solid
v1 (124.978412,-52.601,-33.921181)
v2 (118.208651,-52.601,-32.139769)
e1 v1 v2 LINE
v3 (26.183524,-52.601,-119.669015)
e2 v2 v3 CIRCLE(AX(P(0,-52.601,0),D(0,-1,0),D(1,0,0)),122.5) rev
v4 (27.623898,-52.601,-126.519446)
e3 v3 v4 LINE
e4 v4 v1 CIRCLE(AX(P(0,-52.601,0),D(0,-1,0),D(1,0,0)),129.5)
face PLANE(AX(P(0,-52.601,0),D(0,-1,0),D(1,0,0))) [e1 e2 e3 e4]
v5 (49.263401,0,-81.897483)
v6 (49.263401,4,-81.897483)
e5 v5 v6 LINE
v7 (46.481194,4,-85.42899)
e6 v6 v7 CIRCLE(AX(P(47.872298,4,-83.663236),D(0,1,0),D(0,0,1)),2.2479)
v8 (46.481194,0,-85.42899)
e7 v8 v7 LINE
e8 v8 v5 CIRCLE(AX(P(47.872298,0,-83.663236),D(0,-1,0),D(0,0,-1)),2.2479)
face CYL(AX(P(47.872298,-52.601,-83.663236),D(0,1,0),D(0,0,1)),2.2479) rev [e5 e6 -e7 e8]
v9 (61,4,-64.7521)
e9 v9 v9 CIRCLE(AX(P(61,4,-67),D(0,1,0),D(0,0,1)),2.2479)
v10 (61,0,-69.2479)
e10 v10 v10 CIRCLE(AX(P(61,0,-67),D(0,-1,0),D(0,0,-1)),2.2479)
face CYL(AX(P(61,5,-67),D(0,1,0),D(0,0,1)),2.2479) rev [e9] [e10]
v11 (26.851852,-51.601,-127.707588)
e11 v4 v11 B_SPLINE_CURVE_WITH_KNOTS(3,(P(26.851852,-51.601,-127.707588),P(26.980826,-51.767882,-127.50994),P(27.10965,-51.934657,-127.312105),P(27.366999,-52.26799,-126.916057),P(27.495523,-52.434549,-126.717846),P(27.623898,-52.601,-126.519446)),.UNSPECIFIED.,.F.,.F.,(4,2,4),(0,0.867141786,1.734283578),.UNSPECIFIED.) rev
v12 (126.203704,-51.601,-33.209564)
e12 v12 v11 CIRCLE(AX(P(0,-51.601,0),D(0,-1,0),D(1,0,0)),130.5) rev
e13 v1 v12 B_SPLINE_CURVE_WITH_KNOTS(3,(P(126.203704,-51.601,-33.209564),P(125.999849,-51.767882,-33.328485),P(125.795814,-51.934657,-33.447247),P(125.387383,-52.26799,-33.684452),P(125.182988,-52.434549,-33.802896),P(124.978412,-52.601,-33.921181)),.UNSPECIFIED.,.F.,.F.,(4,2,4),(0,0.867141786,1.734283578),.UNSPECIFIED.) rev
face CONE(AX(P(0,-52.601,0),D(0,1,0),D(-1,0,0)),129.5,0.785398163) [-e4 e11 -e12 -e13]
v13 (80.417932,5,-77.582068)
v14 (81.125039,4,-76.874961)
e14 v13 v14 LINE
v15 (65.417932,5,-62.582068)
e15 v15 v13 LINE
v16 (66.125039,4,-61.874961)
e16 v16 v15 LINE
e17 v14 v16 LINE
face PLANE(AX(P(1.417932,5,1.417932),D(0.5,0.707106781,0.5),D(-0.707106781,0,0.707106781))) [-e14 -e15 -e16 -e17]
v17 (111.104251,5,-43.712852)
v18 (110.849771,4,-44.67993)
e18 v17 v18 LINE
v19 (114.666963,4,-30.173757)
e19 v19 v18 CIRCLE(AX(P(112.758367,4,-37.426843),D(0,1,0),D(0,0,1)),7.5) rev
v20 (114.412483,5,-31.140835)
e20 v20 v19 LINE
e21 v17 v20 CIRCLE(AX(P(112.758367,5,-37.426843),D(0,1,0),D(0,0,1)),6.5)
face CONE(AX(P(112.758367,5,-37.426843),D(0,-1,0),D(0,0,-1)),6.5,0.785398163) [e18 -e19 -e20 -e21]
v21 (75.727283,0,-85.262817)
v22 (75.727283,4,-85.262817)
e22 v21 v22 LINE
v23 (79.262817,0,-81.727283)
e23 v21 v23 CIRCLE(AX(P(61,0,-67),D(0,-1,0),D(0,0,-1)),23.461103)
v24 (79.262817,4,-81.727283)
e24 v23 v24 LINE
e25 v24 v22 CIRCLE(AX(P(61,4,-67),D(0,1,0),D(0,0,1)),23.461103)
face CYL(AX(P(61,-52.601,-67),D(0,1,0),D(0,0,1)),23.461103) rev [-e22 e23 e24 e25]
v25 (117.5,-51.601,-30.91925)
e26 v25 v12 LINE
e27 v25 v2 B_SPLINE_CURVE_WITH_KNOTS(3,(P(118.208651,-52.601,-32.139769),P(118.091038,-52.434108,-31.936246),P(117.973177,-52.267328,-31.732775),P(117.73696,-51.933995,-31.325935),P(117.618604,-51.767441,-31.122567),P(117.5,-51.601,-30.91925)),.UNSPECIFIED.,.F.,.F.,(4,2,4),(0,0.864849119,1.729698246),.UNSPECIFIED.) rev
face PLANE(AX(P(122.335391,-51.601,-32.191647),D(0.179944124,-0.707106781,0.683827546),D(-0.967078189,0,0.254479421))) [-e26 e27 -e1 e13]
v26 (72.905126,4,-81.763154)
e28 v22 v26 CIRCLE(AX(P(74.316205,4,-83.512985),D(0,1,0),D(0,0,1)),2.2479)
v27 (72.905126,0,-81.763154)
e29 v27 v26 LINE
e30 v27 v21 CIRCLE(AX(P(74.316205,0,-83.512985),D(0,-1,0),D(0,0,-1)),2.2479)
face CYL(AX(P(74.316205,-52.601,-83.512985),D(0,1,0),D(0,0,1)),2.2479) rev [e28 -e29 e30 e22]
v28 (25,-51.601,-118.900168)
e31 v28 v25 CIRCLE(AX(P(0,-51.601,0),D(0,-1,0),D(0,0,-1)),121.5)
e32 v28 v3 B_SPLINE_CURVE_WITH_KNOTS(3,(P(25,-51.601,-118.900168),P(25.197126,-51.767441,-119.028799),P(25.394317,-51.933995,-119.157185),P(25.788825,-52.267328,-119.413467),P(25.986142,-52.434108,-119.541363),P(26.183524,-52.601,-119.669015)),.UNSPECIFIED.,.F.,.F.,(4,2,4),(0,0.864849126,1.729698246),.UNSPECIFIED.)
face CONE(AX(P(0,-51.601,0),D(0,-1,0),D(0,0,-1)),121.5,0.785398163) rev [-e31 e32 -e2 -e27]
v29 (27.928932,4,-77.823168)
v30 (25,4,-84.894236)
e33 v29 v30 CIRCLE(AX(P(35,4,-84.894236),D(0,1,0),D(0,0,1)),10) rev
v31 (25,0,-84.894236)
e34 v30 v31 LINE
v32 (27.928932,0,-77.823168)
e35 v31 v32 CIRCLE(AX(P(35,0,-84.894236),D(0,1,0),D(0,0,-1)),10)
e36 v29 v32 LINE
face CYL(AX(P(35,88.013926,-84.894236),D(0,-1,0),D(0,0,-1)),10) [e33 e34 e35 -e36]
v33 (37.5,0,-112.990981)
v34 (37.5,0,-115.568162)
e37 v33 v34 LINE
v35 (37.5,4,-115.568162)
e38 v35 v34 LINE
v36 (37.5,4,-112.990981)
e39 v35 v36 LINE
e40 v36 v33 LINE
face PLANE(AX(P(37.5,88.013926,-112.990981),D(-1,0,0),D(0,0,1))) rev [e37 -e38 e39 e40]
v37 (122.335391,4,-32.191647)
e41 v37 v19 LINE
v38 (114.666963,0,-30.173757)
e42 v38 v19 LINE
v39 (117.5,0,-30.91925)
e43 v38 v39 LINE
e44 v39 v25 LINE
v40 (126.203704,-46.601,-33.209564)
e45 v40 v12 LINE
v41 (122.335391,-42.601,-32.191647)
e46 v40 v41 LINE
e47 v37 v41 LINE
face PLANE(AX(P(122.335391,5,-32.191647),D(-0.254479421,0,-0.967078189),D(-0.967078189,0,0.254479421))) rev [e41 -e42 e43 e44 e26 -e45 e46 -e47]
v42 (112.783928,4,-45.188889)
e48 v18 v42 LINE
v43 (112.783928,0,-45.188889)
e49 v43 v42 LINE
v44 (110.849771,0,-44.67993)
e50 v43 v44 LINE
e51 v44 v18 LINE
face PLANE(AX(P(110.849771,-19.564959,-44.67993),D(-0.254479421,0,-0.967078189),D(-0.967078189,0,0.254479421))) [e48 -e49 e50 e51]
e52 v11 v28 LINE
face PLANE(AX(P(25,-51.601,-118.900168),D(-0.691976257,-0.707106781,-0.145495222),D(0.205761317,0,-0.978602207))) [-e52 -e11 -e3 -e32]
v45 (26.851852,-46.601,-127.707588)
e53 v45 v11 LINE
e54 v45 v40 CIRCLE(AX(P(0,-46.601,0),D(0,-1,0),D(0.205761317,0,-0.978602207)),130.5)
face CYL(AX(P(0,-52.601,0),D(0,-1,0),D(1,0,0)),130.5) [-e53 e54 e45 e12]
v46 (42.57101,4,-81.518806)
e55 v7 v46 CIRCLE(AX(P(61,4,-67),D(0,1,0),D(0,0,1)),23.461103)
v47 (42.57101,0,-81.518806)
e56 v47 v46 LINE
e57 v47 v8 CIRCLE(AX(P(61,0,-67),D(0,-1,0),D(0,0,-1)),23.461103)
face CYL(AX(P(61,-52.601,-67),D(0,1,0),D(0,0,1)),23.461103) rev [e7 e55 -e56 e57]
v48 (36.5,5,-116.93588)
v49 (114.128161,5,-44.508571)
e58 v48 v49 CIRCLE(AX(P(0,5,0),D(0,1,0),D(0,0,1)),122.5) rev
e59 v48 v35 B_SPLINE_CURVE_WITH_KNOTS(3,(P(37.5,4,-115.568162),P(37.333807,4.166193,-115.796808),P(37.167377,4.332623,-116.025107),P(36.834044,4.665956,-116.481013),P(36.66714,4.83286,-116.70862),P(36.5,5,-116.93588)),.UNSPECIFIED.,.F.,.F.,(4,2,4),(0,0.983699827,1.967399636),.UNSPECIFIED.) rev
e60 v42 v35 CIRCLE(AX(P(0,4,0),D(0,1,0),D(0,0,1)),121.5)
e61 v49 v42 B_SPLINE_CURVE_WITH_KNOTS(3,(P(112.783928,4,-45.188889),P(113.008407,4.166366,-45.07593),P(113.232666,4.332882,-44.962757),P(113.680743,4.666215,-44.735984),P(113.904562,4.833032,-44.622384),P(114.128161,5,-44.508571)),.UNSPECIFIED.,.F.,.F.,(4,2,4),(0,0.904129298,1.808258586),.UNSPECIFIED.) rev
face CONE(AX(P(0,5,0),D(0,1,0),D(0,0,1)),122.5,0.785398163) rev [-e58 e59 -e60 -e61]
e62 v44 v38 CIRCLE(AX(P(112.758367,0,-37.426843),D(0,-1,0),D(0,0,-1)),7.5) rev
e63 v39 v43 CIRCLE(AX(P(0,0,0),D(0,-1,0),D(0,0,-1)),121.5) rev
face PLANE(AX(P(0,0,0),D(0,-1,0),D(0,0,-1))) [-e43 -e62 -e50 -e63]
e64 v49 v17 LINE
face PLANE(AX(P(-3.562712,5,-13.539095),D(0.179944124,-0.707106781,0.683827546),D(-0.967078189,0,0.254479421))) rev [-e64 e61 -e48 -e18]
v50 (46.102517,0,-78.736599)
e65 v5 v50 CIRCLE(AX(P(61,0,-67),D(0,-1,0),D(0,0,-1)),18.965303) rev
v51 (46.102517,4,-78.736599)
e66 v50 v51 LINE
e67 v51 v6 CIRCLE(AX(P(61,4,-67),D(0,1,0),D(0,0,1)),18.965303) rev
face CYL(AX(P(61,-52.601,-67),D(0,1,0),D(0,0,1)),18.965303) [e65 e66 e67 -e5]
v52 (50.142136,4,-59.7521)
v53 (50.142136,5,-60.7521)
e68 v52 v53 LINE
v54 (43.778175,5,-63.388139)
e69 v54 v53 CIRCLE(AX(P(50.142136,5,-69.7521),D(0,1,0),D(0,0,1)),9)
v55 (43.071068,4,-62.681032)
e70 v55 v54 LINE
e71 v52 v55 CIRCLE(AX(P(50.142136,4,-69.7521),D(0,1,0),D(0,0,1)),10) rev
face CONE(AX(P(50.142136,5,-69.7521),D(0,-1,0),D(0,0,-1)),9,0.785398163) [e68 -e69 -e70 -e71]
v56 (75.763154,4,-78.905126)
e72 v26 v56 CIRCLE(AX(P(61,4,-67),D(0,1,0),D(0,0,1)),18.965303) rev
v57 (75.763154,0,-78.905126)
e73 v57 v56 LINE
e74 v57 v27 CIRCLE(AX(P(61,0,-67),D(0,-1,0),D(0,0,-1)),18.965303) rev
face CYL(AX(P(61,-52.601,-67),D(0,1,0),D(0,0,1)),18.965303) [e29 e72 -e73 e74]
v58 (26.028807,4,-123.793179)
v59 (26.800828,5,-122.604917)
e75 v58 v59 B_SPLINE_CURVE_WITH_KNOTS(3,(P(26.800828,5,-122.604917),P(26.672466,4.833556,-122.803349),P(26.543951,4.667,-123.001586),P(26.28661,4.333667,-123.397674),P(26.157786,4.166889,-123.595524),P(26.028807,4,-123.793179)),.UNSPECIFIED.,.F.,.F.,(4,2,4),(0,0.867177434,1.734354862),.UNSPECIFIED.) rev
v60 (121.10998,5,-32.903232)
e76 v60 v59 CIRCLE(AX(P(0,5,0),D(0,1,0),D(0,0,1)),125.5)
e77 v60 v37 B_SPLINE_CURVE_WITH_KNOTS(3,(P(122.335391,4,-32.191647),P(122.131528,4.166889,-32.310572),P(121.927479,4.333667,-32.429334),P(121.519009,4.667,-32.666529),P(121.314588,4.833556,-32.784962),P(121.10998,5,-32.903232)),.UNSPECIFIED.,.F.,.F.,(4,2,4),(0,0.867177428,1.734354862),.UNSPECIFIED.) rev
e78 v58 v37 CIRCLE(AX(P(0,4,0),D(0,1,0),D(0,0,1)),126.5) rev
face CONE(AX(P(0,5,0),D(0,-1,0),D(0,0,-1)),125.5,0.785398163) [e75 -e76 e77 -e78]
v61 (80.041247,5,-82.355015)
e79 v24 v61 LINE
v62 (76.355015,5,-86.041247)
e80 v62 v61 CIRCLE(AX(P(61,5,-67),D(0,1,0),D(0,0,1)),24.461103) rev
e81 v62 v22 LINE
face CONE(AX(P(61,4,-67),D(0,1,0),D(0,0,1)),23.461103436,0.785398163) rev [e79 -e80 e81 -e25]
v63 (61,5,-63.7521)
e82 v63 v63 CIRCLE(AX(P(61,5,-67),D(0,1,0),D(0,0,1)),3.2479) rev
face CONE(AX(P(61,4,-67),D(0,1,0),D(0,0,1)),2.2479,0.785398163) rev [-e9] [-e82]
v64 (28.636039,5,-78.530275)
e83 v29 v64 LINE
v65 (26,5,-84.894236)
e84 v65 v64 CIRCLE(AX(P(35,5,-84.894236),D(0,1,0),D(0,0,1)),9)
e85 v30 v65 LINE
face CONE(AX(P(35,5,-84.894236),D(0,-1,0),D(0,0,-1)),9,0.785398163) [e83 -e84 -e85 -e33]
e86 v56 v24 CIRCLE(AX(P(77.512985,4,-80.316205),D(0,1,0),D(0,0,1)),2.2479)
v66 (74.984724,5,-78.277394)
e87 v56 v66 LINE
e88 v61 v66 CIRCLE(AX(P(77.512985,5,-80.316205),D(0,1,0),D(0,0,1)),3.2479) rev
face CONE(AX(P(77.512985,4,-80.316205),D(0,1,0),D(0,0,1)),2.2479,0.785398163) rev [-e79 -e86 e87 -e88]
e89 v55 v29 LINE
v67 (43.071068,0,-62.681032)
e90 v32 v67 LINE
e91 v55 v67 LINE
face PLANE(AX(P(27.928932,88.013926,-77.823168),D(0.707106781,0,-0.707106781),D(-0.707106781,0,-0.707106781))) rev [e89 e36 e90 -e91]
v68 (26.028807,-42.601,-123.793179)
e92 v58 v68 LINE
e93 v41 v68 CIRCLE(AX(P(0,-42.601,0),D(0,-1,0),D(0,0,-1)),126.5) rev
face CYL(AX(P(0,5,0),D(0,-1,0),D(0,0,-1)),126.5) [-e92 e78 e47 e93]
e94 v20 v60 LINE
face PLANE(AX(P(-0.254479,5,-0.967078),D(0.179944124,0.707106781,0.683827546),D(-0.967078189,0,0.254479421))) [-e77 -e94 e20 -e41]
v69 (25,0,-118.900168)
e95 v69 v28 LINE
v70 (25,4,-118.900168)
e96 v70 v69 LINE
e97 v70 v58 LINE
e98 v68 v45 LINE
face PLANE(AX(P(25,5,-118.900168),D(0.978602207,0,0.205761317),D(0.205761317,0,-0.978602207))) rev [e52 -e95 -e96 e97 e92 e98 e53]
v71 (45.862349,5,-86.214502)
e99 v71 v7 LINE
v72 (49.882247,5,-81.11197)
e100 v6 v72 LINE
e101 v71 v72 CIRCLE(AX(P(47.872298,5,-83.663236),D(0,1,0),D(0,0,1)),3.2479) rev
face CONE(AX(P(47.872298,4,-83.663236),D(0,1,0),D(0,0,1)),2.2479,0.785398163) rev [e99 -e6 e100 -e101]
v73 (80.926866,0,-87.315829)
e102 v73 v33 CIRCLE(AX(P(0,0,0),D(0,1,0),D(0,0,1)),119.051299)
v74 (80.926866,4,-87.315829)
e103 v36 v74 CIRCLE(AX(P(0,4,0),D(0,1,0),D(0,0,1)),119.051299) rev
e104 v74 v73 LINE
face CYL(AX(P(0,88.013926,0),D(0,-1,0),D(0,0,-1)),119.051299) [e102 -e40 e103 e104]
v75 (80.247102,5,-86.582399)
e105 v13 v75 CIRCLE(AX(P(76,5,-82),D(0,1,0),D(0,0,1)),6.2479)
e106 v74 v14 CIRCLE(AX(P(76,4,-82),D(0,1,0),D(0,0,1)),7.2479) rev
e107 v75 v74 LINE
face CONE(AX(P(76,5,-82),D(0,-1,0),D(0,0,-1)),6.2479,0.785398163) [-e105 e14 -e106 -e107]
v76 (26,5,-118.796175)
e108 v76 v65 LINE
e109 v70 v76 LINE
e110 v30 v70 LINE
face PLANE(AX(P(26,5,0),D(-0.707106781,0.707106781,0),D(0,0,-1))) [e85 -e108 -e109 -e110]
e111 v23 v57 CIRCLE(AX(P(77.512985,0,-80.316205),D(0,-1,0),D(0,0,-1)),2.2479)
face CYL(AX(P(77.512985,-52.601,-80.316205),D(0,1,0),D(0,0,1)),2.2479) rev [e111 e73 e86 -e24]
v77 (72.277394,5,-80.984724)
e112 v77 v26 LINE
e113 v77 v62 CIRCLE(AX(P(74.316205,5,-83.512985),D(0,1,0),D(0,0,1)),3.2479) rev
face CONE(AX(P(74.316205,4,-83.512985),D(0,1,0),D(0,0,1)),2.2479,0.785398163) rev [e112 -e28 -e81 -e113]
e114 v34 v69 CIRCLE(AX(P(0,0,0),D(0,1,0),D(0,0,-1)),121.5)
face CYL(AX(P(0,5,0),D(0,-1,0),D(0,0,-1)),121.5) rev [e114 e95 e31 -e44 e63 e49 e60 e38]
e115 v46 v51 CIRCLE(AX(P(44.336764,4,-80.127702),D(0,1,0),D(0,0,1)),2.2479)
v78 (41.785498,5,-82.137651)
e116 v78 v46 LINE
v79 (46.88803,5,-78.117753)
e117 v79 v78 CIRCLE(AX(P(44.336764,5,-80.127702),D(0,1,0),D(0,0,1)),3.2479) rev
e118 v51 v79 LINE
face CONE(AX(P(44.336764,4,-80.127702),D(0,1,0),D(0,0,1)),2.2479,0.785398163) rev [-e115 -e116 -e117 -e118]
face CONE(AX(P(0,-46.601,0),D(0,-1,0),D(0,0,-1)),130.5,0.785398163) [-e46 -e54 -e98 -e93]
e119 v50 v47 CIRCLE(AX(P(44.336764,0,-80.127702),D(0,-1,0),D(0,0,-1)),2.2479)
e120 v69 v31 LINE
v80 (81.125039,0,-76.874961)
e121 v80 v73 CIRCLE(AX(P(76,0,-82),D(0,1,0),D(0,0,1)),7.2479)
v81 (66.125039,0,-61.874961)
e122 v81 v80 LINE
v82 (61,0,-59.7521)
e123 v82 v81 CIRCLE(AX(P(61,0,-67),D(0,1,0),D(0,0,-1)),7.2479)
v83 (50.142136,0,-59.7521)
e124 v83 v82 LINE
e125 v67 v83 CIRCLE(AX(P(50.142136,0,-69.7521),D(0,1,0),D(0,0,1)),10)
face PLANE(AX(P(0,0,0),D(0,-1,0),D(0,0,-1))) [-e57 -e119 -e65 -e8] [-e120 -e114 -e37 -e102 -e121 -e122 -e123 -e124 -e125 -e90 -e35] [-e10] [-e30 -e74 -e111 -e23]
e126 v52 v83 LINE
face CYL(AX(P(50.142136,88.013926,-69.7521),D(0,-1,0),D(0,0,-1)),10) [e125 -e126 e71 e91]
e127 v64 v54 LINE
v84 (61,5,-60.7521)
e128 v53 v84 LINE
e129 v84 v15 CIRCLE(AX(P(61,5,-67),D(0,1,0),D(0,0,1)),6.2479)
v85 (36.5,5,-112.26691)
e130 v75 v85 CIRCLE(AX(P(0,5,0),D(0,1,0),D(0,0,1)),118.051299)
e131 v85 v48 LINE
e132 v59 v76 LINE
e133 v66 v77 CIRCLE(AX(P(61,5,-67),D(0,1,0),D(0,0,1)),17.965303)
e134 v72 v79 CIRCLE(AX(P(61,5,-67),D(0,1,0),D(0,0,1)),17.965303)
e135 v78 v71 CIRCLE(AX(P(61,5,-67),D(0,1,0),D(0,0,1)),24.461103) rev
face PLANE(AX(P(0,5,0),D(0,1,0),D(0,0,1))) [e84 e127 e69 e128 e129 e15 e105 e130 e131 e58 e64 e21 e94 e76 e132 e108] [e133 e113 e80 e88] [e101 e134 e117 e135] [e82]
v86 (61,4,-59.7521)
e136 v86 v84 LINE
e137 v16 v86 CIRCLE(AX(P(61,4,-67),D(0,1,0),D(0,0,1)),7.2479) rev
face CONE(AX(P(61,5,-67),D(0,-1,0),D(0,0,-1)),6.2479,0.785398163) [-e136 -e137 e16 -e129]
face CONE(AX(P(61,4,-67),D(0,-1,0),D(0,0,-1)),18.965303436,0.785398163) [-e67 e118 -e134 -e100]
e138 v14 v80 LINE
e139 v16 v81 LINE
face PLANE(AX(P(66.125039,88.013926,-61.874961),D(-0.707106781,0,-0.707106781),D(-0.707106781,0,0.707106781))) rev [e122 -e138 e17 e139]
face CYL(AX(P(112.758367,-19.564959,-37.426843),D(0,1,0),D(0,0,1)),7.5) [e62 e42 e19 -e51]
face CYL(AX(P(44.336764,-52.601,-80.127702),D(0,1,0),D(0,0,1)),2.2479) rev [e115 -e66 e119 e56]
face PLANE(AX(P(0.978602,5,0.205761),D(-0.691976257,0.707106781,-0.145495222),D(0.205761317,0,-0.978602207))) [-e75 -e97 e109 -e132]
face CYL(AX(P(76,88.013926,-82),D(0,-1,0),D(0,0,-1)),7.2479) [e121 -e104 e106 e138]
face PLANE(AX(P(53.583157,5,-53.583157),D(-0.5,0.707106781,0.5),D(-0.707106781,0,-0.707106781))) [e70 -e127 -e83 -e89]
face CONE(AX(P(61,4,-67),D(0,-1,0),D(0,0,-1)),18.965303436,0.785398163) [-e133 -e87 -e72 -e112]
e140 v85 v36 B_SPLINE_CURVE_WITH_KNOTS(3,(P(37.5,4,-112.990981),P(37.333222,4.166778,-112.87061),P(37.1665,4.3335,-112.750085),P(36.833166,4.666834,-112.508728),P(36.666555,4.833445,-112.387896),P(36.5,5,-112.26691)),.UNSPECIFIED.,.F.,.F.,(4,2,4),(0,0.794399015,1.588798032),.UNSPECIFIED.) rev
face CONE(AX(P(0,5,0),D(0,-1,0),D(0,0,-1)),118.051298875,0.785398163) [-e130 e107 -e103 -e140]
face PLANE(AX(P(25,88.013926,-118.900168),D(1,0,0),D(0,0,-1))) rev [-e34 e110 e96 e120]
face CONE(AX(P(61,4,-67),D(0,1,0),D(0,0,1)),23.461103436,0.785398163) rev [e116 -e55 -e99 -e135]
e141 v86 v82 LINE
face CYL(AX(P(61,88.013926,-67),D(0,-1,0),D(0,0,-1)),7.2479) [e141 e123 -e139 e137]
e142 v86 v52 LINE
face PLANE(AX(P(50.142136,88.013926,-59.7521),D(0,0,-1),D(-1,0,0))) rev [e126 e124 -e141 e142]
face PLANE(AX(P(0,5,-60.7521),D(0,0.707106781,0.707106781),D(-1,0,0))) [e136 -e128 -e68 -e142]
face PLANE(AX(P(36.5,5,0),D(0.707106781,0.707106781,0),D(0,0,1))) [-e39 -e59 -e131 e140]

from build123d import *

# Parameters (mm, degrees)
BOSS_EXTRUDE1_DEPTH      = 5
BOSS_EXTRUDE1_DEPTH_BACK = 52.601
BOSS_EXTRUDE2_DEPTH      = 5
SKETCH3_W                = 4
SKETCH3_H                = 6
F_8_CLEARANCE_HOLE1_D    = 4.4958
CHAMFER1_SIZE            = 4
CUT_EXTRUDE7_DEPTH       = 189.558951211
BOSS_EXTRUDE10_START     = -5
BOSS_EXTRUDE10_DEPTH     = 5
CHAMFER4_SIZE            = 1


with BuildPart() as part:
    # Sketch1 → Boss-Extrude1 (new, two sides: drawn at the far end of the back side and taken through both)
    with BuildSketch(Plane(origin=(0, 0, 0), x_dir=(1, 0, 0), z_dir=(0, 1, 0)).offset(-BOSS_EXTRUDE1_DEPTH_BACK)):
        with BuildLine():
            Line((122.335390947, 32.191646773), (117.5, 30.919249667))
            ThreePointArc((117.5, 30.919249667), (83.736031712, 88.037077377), (25, 118.900168208))
            Line((25, 118.900168208), (26.028806584, 123.793179246))
            ThreePointArc((26.028806584, 123.793179246), (87.181958943, 91.660002372), (122.335390947, 32.191646773))
        make_face()
    extrude(amount=BOSS_EXTRUDE1_DEPTH + BOSS_EXTRUDE1_DEPTH_BACK)

    # Sketch2 → Boss-Extrude2 (add)
    with BuildSketch(Plane(origin=(0, 0, 0), x_dir=(1, 0, 0), z_dir=(0, 1, 0))):
        with BuildLine():
            Line((25, 118.900168208), (25, 84.894235624))
            ThreePointArc((25, 84.894235624), (25.761204675, 81.0674013), (27.928932188, 77.823167812))
            Line((27.928932188, 77.823167812), (43.071067812, 62.681032188))
            ThreePointArc((43.071067812, 62.681032188), (46.3153013, 60.513304675), (50.142135624, 59.7521))
            Line((50.142135624, 59.7521), (61, 59.7521))
            ThreePointArc((61, 59.7521), (63.773651249, 60.303813536), (66.125039239, 61.874960761))
            Line((66.125039239, 61.874960761), (81.125039239, 76.874960761))
            ThreePointArc((81.125039239, 76.874960761), (83.24659479, 82.137544003), (80.926866317, 87.315829447))
            ThreePointArc((80.926866317, 87.315829447), (60.589058557, 102.480133426), (37.5, 112.990980896))
            Line((37.5, 112.990980896), (37.5, 115.568161706))
            ThreePointArc((37.5, 115.568161706), (31.294377559, 117.400647073), (25, 118.900168208))
        make_face()
    extrude(amount=BOSS_EXTRUDE2_DEPTH)

    # Sweep1: sweep along a path in Sketch5
    with BuildLine(Plane.XZ.offset(52.601)) as sweep1_path:
        ThreePointArc((26.028806584, -123.793179246), (87.181958943, -91.660002372), (122.335390947, -32.191646773))
    # Sketch3 → Sweep1 (sweep)
    with BuildSketch(Plane(origin=(0, 0, 0), x_dir=(-0.20576131687242788, 0, 0.9786022074770342), z_dir=(-0.9786022074770342, 0, -0.20576131687242788))):
        with Locations((-128.5, -49.601)):
            Rectangle(SKETCH3_W, SKETCH3_H)
    sweep(path=sweep1_path.line)

    # #8 Clearance Hole1 (through all)
    with Locations(Plane(origin=(0, 5, 0), x_dir=(1, 0, 0), z_dir=(0, 1, 0))):
        with Locations((61, 67), (46, 52), (76, 52), (46, 82), (76, 82)):
            Hole(F_8_CLEARANCE_HOLE1_D / 2)

    # Chamfer1
    chamfer1_edges = [part.edges().sort_by_distance(p)[0] for p in [
        (87.181958943, -46.601, -91.660002372),
    ]]
    chamfer(chamfer1_edges, length=CHAMFER1_SIZE - 0.0001)  # a hair under: the kernel refuses the full size

    # Sketch21 → Cut-Extrude7 (cut, through all)
    with BuildSketch(Plane(origin=(0, 5, 0), x_dir=(1, 0, 0), z_dir=(0, 1, 0))):
        with BuildLine():
            ThreePointArc((46.481194337, 85.428989569), (44.410494667, 83.589505333), (42.571010431, 81.518805663))
            ThreePointArc((42.571010431, 81.518805663), (42.945660431, 78.361948651), (46.102517444, 78.736598651))
            ThreePointArc((46.102517444, 78.736598651), (47.589505333, 80.410494667), (49.263401349, 81.897482556))
            ThreePointArc((49.263401349, 81.897482556), (49.638051349, 85.054339569), (46.481194337, 85.428989569))
        make_face()
        with BuildLine():
            ThreePointArc((79.262817338, 81.727283432), (77.589505333, 83.589505333), (75.727283432, 85.262817338))
            ThreePointArc((75.727283432, 85.262817338), (72.566372961, 84.924064019), (72.90512628, 81.763153547))
            ThreePointArc((72.90512628, 81.763153547), (74.410494667, 80.410494667), (75.763153547, 78.90512628))
            ThreePointArc((75.763153547, 78.90512628), (78.924064019, 78.566372961), (79.262817338, 81.727283432))
        make_face()
    extrude(amount=-CUT_EXTRUDE7_DEPTH, mode=Mode.SUBTRACT)

    # Sketch32 → Boss-Extrude10 (add)
    with BuildSketch(Plane(origin=(0, 5, 0), x_dir=(1, 0, 0), z_dir=(0, 1, 0)).offset(BOSS_EXTRUDE10_START)):
        with BuildLine():
            Line((117.5, 30.919249667), (114.666962611, 30.173756984))
            ThreePointArc((114.666962611, 30.173756984), (105.505280532, 35.518247745), (110.849771294, 44.679929823))
            Line((110.849771294, 44.679929823), (112.783927672, 45.188888665))
            ThreePointArc((112.783927672, 45.188888665), (115.362808068, 38.127057514), (117.5, 30.919249667))
        make_face()
    extrude(amount=BOSS_EXTRUDE10_DEPTH)

    # Chamfer4
    chamfer4_edges = [part.edges().sort_by_distance(p)[0] for p in [
        (87.181958943, 5, -91.660002372),
        (44.410494667, 5, -83.589505333),
        (47.589505333, 5, -80.410494667),
        (49.638051349, 5, -85.054339569),
        (42.945660431, 5, -78.361948651),
        (74.410494667, 5, -80.410494667),
        (77.589505333, 5, -83.589505333),
        (121.851851852, -52.601, -32.064407063),
        (72.566372961, 5, -84.924064019),
        (78.924064019, 5, -78.566372961),
        (25.925925926, -52.601, -123.303878142),
        (83.736031712, -52.601, -88.037077377),
        (25.514403292, 5, -121.346673727),
        (111.816849483, 5, -44.934409244),
        (105.505280532, 5, -35.518247745),
        (82.973641884, 5, -88.755984319),
        (37.5, 5, -114.279571301),
        (25, 5, -101.897201916),
        (25.761204675, 5, -81.0674013),
        (35.5, 5, -70.2521),
        (46.3153013, 5, -60.513304675),
        (55.571067812, 5, -59.7521),
        (63.773651249, 5, -60.303813536),
        (73.625039239, 5, -69.374960761),
        (83.24659479, 5, -82.137544003),
        (60.589058557, 5, -102.480133426),
        (89.938700727, -52.601, -94.558342368),
        (118.501176779, 5, -31.182701878),
        (63.2479, 5, -67),
    ]]
    chamfer(chamfer4_edges, length=CHAMFER4_SIZE)


solid = part.part
